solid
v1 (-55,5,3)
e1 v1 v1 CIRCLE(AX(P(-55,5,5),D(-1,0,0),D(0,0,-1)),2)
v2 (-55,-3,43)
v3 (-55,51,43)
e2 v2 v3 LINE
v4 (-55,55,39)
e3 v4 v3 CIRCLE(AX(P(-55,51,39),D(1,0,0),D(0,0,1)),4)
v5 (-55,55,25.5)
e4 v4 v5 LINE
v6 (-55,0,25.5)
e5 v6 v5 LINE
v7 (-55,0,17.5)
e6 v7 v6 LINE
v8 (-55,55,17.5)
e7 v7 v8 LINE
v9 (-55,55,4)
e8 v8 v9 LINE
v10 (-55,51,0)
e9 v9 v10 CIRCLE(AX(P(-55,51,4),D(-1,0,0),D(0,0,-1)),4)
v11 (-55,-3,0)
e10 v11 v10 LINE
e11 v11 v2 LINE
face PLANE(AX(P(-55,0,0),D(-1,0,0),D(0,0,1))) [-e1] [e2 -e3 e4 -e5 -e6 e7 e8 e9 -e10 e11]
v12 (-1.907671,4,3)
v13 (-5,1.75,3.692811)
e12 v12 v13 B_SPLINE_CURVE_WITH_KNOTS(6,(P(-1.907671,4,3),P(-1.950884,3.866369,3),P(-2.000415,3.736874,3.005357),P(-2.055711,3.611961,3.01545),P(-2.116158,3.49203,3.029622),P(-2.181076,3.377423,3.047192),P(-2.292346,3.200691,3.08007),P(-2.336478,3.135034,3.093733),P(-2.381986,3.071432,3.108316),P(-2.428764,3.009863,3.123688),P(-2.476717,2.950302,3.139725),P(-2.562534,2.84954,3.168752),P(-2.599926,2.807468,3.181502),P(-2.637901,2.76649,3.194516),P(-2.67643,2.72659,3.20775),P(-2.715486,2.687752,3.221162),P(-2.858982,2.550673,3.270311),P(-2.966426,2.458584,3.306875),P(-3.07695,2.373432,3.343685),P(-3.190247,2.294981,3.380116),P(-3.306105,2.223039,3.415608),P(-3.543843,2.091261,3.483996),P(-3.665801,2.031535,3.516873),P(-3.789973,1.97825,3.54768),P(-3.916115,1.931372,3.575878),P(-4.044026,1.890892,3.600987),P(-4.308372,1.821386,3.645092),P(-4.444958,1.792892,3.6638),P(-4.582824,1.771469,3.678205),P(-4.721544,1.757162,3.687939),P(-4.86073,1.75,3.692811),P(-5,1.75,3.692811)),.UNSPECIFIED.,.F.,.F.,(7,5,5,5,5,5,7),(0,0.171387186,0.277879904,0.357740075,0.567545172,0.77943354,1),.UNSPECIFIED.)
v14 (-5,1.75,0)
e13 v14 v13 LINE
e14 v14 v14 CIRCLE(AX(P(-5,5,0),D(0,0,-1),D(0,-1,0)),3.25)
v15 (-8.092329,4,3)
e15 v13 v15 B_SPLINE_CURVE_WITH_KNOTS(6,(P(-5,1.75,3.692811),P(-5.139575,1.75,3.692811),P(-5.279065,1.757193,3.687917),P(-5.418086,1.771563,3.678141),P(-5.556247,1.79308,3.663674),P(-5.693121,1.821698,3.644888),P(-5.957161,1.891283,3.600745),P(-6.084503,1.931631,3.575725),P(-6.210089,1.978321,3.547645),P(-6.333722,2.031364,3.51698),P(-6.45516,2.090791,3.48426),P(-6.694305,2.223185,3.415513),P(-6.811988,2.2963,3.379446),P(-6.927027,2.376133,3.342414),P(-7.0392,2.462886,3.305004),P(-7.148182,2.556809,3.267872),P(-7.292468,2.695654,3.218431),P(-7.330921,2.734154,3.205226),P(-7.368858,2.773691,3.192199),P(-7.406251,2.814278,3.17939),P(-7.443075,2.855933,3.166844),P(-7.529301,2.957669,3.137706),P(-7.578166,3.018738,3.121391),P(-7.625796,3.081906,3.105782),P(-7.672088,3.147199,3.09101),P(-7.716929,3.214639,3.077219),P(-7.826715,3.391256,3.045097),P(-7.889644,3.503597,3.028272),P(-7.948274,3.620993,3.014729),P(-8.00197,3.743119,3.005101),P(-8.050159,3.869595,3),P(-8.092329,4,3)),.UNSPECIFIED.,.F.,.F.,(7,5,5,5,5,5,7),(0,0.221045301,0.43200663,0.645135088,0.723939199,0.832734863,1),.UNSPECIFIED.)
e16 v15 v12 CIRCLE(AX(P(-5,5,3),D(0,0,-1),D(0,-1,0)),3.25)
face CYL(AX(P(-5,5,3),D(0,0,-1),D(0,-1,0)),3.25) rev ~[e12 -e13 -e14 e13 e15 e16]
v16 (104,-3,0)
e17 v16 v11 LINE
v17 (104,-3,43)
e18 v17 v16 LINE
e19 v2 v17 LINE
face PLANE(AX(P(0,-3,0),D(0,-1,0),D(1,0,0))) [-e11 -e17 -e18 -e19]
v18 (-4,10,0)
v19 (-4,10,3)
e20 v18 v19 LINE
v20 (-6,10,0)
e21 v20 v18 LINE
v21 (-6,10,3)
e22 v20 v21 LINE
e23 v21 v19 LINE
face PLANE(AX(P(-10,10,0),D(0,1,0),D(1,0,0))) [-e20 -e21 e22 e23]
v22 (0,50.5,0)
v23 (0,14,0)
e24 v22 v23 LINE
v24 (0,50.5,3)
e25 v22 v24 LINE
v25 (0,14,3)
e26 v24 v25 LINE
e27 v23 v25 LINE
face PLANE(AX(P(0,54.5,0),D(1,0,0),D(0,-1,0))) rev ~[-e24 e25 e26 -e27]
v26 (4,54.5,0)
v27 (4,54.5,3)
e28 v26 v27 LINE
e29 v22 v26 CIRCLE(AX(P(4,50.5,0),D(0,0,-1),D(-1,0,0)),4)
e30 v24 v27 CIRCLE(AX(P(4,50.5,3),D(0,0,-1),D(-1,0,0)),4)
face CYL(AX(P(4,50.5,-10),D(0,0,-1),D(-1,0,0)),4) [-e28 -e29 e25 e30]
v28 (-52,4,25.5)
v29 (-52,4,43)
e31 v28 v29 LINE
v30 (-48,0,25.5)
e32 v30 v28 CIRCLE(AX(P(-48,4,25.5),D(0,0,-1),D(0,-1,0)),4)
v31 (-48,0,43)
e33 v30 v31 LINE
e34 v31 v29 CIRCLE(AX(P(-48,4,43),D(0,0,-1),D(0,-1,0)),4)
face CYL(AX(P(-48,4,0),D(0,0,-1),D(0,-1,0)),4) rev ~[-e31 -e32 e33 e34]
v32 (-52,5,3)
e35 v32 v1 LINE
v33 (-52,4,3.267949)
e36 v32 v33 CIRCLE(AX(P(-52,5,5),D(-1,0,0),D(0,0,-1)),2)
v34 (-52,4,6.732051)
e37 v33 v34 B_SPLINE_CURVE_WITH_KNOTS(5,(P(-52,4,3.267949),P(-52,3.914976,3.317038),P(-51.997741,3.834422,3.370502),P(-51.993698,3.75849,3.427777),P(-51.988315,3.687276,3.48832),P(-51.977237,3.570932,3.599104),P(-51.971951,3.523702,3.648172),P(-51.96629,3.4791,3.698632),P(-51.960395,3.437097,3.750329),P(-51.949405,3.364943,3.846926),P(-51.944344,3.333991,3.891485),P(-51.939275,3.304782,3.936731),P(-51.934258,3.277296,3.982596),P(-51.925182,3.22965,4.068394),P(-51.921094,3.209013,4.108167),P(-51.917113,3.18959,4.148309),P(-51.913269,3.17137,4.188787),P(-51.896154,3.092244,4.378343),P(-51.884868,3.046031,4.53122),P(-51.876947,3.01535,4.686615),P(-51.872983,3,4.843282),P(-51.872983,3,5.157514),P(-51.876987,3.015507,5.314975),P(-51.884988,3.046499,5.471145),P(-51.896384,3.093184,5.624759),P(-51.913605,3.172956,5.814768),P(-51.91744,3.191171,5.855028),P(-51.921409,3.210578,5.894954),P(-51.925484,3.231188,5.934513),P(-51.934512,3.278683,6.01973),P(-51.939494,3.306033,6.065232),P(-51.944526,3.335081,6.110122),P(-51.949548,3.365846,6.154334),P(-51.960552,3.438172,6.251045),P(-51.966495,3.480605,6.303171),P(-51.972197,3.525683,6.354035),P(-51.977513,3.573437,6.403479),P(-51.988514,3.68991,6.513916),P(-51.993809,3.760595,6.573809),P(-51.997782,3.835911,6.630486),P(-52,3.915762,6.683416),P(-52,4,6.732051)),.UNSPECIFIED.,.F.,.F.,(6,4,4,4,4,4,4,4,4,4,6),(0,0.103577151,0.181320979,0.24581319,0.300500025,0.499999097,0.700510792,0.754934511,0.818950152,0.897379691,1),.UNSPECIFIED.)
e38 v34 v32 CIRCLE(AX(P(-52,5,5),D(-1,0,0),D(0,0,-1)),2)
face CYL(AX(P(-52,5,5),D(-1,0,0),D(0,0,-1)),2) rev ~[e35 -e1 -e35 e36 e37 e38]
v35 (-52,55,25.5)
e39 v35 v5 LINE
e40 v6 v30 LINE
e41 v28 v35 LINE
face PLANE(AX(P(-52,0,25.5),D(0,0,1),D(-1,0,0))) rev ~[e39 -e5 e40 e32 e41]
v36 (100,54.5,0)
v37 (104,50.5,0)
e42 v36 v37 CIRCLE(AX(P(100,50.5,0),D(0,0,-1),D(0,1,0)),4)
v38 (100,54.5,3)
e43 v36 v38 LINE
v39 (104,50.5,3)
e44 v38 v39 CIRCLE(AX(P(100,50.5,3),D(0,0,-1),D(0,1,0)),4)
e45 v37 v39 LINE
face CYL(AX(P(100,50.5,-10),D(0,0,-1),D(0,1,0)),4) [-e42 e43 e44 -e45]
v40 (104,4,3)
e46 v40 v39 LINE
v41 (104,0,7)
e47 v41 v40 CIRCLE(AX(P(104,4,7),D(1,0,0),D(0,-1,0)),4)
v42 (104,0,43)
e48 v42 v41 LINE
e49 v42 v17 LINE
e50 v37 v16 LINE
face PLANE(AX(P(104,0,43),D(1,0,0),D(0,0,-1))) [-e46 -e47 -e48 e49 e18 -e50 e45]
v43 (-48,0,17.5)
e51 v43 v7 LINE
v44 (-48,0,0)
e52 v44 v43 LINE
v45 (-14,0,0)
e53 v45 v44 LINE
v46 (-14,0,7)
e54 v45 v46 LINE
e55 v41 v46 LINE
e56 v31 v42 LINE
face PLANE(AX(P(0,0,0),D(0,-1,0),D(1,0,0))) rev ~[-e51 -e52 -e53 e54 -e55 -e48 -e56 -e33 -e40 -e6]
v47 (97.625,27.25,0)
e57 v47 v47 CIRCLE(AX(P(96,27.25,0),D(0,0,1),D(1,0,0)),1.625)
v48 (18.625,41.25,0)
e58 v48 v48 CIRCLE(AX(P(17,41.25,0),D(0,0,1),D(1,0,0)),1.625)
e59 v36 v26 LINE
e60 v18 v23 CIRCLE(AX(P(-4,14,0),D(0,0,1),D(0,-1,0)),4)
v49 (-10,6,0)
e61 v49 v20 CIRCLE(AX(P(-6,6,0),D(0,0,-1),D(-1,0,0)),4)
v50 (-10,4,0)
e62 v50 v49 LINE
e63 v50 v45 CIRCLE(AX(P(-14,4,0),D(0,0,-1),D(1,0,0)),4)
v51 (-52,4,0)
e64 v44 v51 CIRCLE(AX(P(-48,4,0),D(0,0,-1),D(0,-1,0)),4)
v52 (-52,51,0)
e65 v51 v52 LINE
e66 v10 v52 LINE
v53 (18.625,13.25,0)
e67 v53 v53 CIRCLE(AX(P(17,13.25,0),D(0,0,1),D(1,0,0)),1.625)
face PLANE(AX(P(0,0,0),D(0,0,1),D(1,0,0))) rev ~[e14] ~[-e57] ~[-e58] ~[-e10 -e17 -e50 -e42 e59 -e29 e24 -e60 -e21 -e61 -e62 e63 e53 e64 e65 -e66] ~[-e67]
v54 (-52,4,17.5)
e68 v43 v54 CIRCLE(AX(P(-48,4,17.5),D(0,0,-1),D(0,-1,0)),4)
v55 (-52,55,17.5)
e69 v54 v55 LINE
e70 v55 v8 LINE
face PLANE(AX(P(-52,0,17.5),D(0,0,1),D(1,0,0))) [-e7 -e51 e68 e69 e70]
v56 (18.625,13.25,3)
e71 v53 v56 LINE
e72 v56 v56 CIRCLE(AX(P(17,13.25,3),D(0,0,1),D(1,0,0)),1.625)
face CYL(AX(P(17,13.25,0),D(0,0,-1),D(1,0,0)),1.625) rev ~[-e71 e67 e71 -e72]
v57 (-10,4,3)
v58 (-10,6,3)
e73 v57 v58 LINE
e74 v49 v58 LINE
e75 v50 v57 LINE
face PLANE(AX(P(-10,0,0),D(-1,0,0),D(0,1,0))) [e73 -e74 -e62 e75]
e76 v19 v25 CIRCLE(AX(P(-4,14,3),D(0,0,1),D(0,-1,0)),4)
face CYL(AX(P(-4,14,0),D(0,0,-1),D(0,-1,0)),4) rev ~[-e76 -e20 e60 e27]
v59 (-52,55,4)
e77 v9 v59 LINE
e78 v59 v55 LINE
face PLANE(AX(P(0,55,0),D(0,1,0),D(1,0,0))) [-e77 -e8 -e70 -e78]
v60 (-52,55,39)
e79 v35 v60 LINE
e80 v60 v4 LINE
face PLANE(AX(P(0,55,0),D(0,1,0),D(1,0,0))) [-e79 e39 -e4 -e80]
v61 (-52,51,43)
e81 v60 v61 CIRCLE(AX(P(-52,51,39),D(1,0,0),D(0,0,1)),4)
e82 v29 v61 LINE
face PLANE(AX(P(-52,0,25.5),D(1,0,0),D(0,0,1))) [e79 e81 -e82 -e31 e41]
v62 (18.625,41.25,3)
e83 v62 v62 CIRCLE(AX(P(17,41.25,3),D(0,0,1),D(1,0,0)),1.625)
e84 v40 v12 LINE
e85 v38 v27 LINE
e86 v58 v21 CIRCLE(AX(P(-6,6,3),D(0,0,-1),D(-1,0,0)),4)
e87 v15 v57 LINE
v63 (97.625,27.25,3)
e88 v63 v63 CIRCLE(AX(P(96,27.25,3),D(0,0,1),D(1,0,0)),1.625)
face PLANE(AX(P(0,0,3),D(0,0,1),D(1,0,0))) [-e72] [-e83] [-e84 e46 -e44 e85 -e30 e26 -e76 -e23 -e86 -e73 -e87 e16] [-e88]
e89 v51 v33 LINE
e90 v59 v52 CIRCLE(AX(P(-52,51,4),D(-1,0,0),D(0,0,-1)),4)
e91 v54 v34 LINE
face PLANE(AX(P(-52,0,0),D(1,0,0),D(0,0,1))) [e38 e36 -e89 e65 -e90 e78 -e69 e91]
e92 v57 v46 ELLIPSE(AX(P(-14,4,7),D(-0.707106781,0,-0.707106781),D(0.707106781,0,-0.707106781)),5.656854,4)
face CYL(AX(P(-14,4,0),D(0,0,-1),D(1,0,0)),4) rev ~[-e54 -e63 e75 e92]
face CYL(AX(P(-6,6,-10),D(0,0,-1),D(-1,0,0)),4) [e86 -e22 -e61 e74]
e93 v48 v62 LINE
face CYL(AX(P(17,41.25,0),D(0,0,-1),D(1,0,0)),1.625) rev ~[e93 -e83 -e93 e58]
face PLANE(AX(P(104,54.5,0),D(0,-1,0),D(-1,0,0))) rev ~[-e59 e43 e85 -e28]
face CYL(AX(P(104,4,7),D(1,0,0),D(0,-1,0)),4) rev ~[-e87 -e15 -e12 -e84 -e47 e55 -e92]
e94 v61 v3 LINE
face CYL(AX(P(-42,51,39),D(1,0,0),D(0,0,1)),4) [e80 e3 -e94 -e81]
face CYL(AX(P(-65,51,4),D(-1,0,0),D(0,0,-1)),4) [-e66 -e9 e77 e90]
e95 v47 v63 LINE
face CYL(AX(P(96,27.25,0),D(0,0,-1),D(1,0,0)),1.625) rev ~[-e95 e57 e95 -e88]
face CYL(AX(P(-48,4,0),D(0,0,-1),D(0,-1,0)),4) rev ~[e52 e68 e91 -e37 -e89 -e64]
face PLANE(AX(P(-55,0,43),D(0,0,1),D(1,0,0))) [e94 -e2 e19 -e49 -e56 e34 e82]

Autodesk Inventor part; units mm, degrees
ref_plane "YZ Plane" through (0, 0, 0) normal (1, 0, 0) x (0, 1, 0)
ref_plane "XZ Plane" through (0, 0, 0) normal (0, 1, 0) x (-1, 0, 0)
ref_plane "XY Plane" through (0, 0, 0) normal (0, 0, 1) x (1, 0, 0)
sketch "Sketch1" plane through (0, 0, 0) normal (0, 0, 1) x (1, 0, 0)
  line L0 (0, 0) -> (104, 0)
  line L1 (104, 0) -> (104, 54.5)
  line L2 (104, 54.5) -> (0, 54.5)
  line L3 (0, 54.5) -> (0, 10)
  circle A0 centre (96, 27.25) radius 1.625
  circle A1 centre (17, 41.25) radius 1.625
  circle A2 centre (17, 13.25) radius 1.625
  line L4 (0, 0) -> (-10, 0)
  line L5 (-10, 0) -> (-10, 10)
  line L6 (-10, 10) -> (0, 10)
  dimension "d0" = 104
  dimension "d1" = 54.5
  dimension "d9" = 28
  dimension "d10" = 13.25
  dimension "d11" = 17
  dimension "d12" = 3.25
  dimension "d13" = 3.25
  dimension "d14" = 17
  dimension "d15" = 8
  dimension "d16" = 3.25
  dimension "d17" = 27.25
  dimension "d34" = 10
  dimension "d35" = 10
extrude "Main Mount" add sketch "Sketch1" along normal blind 3
sketch "Sketch2" plane through (0, 0, 0) normal (0, -1, 0) x (1, 0, 0)
  line L0 (104, 0) -> (0, 0)
  line L1 (0, 0) -> (104, 0) projected
  line L2 (0, 0) -> (-55, 0)
  line L3 (-55, 0) -> (-55, 43)
  line L4 (-55, 43) -> (104, 43)
  line L5 (104, 43) -> (104, 0)
  line L6 (104, 0) -> (0, 0)
  dimension "d20" = 55
  dimension "d21" = 43
extrude "Base" add sketch "Sketch2" along normal blind 3
sketch "Sketch3" plane through (0, 0, 0) normal (0, 1, 0) x (1, 0, 0)
  line L0 (-55, 0) -> (-52, 0)
  line L1 (-55, 0) -> (104, 0) projected
  line L2 (-52, -43) -> (-55, -43)
  line L3 (-55, -43) -> (-55, 0)
  line L4 (-55, -43) -> (-55, 0) projected
  line L5 (-52, -17.5) -> (-55, -17.5)
  line L6 (-55, -43) -> (-55, 0) projected
  line L7 (-52, -25.5) -> (-55, -25.5)
  line L8 (-52, 0) -> (-52, -17.5)
  line L9 (-52, -25.5) -> (-52, -43)
  dimension "d24" = 3
  dimension "d31" = 8
extrude "Laser Mount" add sketch "Sketch3" along normal blind 55
hole "Cable Management" at (-5, 5, 3) direction (0, 0, -1) diameter 6.5 depth 8 tip angle 118
hole "Cable Routing" at (-52, 5, 5) direction (-1, 0, 0) diameter 4 depth 8 tip angle 118
fillet "Strength" radius 4 10 edges at (-52, 0, 8.75) (-52, 0, 34.25) (-53.5, 55, 43) (-53.5, 55, 0) (47, 0, 3) (-10, 0, 1.5) (-10, 10, 1.5) (0, 10, 1.5) (0, 54.5, 1.5) (104, 54.5, 1.5)
properties part number "LaserMount"
